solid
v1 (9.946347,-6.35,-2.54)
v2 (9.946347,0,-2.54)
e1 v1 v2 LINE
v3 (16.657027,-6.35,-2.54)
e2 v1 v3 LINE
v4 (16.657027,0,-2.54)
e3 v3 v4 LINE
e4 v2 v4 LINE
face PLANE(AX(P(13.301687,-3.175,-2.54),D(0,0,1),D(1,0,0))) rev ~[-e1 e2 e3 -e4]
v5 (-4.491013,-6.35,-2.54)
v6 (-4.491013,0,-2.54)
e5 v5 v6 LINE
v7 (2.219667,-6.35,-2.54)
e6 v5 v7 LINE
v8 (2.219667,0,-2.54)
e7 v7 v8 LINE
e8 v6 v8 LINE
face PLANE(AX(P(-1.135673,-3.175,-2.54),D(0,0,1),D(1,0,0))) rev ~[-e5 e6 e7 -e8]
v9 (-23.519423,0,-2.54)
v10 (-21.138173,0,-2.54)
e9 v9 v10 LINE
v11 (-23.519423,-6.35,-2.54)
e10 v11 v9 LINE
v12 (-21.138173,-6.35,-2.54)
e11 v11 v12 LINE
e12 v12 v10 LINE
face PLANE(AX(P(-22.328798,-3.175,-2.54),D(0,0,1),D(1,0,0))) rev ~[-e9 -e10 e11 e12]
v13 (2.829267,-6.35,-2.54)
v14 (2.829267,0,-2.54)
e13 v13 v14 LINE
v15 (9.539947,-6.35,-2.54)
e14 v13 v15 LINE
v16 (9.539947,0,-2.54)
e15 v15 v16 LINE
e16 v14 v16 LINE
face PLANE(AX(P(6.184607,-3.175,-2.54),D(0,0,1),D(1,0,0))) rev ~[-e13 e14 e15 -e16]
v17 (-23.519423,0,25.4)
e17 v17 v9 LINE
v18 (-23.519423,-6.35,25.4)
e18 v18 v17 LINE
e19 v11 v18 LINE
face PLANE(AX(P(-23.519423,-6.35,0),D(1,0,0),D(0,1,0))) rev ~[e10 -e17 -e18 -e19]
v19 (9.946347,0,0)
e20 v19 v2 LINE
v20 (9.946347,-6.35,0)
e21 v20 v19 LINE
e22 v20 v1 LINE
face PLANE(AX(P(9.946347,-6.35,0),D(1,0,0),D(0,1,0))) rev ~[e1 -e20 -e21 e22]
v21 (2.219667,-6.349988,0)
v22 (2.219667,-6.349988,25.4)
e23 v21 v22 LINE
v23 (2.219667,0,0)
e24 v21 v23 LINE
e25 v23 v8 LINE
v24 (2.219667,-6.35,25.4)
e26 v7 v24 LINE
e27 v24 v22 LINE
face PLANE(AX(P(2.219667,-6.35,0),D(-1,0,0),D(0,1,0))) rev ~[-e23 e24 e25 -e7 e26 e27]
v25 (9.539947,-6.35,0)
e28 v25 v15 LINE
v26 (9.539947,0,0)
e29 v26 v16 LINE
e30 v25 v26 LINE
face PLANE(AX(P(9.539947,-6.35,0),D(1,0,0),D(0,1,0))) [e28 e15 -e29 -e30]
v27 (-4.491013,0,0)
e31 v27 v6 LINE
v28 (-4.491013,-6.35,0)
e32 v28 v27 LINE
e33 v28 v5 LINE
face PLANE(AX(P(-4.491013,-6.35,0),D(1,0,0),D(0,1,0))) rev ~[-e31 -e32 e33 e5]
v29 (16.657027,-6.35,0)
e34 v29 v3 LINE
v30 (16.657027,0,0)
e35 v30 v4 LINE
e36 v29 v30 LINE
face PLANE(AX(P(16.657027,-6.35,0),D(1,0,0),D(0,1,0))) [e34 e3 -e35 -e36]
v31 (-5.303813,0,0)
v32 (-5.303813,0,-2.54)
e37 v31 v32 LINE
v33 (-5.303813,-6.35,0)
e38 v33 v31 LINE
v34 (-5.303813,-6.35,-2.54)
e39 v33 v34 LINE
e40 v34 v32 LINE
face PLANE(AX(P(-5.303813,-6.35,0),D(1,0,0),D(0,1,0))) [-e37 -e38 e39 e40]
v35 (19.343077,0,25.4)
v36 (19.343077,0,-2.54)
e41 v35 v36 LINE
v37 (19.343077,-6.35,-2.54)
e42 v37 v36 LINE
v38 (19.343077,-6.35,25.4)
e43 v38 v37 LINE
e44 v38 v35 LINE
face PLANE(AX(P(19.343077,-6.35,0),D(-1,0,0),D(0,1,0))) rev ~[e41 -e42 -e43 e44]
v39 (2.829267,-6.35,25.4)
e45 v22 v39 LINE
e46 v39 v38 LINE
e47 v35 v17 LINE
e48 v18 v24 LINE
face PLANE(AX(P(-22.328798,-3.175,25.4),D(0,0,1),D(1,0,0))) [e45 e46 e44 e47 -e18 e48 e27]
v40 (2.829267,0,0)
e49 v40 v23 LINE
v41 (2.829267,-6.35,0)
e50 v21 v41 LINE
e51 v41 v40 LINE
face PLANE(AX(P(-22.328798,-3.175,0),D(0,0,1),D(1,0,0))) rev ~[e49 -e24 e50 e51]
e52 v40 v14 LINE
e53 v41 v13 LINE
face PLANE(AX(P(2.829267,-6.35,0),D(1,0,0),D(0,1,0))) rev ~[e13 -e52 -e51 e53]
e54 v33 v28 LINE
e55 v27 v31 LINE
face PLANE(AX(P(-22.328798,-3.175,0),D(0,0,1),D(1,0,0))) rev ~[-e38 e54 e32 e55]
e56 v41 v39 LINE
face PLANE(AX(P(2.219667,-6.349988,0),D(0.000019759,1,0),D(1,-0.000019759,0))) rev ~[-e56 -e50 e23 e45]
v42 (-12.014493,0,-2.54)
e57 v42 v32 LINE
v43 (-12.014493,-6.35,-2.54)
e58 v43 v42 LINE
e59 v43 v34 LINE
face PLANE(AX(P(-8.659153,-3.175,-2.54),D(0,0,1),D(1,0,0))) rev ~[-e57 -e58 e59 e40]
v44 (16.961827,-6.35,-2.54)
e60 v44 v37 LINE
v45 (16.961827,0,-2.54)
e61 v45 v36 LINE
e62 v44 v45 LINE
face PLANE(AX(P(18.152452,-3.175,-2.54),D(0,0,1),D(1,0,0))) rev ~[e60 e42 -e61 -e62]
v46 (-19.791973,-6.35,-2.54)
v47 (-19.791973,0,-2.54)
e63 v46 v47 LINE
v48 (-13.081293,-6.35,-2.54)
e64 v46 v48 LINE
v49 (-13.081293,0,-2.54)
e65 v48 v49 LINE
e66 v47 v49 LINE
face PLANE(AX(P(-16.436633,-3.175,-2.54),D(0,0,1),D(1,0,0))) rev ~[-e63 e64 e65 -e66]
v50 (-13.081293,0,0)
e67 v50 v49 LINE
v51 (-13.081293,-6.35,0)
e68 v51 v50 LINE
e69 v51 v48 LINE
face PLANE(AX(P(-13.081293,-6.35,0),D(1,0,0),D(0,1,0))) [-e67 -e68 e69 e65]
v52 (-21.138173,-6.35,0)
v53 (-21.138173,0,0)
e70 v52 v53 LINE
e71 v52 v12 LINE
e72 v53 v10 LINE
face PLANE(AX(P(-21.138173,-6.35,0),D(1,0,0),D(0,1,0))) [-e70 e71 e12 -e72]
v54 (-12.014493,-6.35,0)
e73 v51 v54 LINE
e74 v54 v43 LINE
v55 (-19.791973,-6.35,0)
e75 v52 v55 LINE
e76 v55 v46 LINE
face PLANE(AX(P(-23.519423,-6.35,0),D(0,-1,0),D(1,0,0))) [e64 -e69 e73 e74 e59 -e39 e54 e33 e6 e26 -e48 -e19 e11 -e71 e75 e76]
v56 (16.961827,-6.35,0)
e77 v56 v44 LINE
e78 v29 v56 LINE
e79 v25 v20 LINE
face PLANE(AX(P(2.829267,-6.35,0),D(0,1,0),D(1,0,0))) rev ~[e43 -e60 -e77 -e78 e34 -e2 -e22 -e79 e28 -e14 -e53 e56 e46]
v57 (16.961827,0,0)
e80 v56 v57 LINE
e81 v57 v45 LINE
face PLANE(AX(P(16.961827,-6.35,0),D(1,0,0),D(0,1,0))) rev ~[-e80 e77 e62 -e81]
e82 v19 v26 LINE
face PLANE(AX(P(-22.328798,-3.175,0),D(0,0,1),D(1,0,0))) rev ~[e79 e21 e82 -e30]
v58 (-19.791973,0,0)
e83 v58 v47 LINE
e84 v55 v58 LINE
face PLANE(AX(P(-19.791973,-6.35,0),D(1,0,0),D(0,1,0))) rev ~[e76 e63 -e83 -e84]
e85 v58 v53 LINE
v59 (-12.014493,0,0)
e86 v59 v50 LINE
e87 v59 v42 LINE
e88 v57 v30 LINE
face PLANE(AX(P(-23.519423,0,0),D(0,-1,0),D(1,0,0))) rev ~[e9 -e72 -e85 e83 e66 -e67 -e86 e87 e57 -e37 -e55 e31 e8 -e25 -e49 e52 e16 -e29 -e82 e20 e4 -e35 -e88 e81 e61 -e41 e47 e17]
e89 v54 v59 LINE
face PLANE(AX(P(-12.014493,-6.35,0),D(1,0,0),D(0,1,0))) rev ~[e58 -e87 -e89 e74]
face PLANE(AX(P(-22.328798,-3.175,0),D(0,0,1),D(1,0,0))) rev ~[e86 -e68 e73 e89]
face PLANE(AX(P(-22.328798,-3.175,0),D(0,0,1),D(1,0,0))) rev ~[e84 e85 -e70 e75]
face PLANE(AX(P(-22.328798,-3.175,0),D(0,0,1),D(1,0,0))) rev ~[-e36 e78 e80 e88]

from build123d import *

# Parameters (mm, degrees)
F0_W     = 2.38125
F0_H     = 6.35
F0_W_2   = 1.3462
F0_W_3   = 6.71068
F0_W_4   = 1.0668
F0_W_5   = 0.8128
F0_W_6   = 0.4064
F0_W_7   = 0.3048
F1_DEPTH = 25.4
F2_DEPTH = 2.54


# Not quite as in the source:
# - ends of sketch curves that miss each other by under 0.0002 mm in the source are joined


with BuildPart() as f1:
    # F0 (on Top) → F1 (new body)
    with BuildSketch(Plane.XY):
        with Locations((-22.328797859, -3.175)):
            Rectangle(F0_W, F0_H)
        with Locations((18.152452141, -3.175)):
            Rectangle(F0_W, F0_H)
        with Locations((-20.465072859, -3.175)):
            Rectangle(F0_W_2, F0_H)
        with Locations((-16.436632859, -3.175)):
            Rectangle(F0_W_3, F0_H)
        with Locations((-12.547892859, -3.175)):
            Rectangle(F0_W_4, F0_H)
        with Locations((-8.659152859, -3.175)):
            Rectangle(F0_W_3, F0_H)
        with Locations((-4.897412859, -3.175)):
            Rectangle(F0_W_5, F0_H)
        with Locations((-1.135672859, -3.175)):
            Rectangle(F0_W_3, F0_H)
        Polygon((2.829267141, 0), (2.219667141, 0), (2.219667141, -6.3499879551), (2.829267141, -6.35), align=None)
        with Locations((6.184607141, -3.175)):
            Rectangle(F0_W_3, F0_H)
        with Locations((9.743147141, -3.175)):
            Rectangle(F0_W_6, F0_H)
        with Locations((13.301687141, -3.175)):
            Rectangle(F0_W_3, F0_H)
        with Locations((16.809427141, -3.175)):
            Rectangle(F0_W_7, F0_H)
    extrude(amount=F1_DEPTH)

    # F0 (on Top) → F2 (join)
    with BuildSketch(Plane.XY):
        with Locations((-22.328797859, -3.175)):
            Rectangle(F0_W, F0_H)
        with Locations((-16.436632859, -3.175)):
            Rectangle(F0_W_3, F0_H)
        with Locations((-8.659152859, -3.175)):
            Rectangle(F0_W_3, F0_H)
        with Locations((-1.135672859, -3.175)):
            Rectangle(F0_W_3, F0_H)
        with Locations((6.184607141, -3.175)):
            Rectangle(F0_W_3, F0_H)
        with Locations((13.301687141, -3.175)):
            Rectangle(F0_W_3, F0_H)
        with Locations((18.152452141, -3.175)):
            Rectangle(F0_W, F0_H)
    extrude(amount=-F2_DEPTH)


solid = f1.part
